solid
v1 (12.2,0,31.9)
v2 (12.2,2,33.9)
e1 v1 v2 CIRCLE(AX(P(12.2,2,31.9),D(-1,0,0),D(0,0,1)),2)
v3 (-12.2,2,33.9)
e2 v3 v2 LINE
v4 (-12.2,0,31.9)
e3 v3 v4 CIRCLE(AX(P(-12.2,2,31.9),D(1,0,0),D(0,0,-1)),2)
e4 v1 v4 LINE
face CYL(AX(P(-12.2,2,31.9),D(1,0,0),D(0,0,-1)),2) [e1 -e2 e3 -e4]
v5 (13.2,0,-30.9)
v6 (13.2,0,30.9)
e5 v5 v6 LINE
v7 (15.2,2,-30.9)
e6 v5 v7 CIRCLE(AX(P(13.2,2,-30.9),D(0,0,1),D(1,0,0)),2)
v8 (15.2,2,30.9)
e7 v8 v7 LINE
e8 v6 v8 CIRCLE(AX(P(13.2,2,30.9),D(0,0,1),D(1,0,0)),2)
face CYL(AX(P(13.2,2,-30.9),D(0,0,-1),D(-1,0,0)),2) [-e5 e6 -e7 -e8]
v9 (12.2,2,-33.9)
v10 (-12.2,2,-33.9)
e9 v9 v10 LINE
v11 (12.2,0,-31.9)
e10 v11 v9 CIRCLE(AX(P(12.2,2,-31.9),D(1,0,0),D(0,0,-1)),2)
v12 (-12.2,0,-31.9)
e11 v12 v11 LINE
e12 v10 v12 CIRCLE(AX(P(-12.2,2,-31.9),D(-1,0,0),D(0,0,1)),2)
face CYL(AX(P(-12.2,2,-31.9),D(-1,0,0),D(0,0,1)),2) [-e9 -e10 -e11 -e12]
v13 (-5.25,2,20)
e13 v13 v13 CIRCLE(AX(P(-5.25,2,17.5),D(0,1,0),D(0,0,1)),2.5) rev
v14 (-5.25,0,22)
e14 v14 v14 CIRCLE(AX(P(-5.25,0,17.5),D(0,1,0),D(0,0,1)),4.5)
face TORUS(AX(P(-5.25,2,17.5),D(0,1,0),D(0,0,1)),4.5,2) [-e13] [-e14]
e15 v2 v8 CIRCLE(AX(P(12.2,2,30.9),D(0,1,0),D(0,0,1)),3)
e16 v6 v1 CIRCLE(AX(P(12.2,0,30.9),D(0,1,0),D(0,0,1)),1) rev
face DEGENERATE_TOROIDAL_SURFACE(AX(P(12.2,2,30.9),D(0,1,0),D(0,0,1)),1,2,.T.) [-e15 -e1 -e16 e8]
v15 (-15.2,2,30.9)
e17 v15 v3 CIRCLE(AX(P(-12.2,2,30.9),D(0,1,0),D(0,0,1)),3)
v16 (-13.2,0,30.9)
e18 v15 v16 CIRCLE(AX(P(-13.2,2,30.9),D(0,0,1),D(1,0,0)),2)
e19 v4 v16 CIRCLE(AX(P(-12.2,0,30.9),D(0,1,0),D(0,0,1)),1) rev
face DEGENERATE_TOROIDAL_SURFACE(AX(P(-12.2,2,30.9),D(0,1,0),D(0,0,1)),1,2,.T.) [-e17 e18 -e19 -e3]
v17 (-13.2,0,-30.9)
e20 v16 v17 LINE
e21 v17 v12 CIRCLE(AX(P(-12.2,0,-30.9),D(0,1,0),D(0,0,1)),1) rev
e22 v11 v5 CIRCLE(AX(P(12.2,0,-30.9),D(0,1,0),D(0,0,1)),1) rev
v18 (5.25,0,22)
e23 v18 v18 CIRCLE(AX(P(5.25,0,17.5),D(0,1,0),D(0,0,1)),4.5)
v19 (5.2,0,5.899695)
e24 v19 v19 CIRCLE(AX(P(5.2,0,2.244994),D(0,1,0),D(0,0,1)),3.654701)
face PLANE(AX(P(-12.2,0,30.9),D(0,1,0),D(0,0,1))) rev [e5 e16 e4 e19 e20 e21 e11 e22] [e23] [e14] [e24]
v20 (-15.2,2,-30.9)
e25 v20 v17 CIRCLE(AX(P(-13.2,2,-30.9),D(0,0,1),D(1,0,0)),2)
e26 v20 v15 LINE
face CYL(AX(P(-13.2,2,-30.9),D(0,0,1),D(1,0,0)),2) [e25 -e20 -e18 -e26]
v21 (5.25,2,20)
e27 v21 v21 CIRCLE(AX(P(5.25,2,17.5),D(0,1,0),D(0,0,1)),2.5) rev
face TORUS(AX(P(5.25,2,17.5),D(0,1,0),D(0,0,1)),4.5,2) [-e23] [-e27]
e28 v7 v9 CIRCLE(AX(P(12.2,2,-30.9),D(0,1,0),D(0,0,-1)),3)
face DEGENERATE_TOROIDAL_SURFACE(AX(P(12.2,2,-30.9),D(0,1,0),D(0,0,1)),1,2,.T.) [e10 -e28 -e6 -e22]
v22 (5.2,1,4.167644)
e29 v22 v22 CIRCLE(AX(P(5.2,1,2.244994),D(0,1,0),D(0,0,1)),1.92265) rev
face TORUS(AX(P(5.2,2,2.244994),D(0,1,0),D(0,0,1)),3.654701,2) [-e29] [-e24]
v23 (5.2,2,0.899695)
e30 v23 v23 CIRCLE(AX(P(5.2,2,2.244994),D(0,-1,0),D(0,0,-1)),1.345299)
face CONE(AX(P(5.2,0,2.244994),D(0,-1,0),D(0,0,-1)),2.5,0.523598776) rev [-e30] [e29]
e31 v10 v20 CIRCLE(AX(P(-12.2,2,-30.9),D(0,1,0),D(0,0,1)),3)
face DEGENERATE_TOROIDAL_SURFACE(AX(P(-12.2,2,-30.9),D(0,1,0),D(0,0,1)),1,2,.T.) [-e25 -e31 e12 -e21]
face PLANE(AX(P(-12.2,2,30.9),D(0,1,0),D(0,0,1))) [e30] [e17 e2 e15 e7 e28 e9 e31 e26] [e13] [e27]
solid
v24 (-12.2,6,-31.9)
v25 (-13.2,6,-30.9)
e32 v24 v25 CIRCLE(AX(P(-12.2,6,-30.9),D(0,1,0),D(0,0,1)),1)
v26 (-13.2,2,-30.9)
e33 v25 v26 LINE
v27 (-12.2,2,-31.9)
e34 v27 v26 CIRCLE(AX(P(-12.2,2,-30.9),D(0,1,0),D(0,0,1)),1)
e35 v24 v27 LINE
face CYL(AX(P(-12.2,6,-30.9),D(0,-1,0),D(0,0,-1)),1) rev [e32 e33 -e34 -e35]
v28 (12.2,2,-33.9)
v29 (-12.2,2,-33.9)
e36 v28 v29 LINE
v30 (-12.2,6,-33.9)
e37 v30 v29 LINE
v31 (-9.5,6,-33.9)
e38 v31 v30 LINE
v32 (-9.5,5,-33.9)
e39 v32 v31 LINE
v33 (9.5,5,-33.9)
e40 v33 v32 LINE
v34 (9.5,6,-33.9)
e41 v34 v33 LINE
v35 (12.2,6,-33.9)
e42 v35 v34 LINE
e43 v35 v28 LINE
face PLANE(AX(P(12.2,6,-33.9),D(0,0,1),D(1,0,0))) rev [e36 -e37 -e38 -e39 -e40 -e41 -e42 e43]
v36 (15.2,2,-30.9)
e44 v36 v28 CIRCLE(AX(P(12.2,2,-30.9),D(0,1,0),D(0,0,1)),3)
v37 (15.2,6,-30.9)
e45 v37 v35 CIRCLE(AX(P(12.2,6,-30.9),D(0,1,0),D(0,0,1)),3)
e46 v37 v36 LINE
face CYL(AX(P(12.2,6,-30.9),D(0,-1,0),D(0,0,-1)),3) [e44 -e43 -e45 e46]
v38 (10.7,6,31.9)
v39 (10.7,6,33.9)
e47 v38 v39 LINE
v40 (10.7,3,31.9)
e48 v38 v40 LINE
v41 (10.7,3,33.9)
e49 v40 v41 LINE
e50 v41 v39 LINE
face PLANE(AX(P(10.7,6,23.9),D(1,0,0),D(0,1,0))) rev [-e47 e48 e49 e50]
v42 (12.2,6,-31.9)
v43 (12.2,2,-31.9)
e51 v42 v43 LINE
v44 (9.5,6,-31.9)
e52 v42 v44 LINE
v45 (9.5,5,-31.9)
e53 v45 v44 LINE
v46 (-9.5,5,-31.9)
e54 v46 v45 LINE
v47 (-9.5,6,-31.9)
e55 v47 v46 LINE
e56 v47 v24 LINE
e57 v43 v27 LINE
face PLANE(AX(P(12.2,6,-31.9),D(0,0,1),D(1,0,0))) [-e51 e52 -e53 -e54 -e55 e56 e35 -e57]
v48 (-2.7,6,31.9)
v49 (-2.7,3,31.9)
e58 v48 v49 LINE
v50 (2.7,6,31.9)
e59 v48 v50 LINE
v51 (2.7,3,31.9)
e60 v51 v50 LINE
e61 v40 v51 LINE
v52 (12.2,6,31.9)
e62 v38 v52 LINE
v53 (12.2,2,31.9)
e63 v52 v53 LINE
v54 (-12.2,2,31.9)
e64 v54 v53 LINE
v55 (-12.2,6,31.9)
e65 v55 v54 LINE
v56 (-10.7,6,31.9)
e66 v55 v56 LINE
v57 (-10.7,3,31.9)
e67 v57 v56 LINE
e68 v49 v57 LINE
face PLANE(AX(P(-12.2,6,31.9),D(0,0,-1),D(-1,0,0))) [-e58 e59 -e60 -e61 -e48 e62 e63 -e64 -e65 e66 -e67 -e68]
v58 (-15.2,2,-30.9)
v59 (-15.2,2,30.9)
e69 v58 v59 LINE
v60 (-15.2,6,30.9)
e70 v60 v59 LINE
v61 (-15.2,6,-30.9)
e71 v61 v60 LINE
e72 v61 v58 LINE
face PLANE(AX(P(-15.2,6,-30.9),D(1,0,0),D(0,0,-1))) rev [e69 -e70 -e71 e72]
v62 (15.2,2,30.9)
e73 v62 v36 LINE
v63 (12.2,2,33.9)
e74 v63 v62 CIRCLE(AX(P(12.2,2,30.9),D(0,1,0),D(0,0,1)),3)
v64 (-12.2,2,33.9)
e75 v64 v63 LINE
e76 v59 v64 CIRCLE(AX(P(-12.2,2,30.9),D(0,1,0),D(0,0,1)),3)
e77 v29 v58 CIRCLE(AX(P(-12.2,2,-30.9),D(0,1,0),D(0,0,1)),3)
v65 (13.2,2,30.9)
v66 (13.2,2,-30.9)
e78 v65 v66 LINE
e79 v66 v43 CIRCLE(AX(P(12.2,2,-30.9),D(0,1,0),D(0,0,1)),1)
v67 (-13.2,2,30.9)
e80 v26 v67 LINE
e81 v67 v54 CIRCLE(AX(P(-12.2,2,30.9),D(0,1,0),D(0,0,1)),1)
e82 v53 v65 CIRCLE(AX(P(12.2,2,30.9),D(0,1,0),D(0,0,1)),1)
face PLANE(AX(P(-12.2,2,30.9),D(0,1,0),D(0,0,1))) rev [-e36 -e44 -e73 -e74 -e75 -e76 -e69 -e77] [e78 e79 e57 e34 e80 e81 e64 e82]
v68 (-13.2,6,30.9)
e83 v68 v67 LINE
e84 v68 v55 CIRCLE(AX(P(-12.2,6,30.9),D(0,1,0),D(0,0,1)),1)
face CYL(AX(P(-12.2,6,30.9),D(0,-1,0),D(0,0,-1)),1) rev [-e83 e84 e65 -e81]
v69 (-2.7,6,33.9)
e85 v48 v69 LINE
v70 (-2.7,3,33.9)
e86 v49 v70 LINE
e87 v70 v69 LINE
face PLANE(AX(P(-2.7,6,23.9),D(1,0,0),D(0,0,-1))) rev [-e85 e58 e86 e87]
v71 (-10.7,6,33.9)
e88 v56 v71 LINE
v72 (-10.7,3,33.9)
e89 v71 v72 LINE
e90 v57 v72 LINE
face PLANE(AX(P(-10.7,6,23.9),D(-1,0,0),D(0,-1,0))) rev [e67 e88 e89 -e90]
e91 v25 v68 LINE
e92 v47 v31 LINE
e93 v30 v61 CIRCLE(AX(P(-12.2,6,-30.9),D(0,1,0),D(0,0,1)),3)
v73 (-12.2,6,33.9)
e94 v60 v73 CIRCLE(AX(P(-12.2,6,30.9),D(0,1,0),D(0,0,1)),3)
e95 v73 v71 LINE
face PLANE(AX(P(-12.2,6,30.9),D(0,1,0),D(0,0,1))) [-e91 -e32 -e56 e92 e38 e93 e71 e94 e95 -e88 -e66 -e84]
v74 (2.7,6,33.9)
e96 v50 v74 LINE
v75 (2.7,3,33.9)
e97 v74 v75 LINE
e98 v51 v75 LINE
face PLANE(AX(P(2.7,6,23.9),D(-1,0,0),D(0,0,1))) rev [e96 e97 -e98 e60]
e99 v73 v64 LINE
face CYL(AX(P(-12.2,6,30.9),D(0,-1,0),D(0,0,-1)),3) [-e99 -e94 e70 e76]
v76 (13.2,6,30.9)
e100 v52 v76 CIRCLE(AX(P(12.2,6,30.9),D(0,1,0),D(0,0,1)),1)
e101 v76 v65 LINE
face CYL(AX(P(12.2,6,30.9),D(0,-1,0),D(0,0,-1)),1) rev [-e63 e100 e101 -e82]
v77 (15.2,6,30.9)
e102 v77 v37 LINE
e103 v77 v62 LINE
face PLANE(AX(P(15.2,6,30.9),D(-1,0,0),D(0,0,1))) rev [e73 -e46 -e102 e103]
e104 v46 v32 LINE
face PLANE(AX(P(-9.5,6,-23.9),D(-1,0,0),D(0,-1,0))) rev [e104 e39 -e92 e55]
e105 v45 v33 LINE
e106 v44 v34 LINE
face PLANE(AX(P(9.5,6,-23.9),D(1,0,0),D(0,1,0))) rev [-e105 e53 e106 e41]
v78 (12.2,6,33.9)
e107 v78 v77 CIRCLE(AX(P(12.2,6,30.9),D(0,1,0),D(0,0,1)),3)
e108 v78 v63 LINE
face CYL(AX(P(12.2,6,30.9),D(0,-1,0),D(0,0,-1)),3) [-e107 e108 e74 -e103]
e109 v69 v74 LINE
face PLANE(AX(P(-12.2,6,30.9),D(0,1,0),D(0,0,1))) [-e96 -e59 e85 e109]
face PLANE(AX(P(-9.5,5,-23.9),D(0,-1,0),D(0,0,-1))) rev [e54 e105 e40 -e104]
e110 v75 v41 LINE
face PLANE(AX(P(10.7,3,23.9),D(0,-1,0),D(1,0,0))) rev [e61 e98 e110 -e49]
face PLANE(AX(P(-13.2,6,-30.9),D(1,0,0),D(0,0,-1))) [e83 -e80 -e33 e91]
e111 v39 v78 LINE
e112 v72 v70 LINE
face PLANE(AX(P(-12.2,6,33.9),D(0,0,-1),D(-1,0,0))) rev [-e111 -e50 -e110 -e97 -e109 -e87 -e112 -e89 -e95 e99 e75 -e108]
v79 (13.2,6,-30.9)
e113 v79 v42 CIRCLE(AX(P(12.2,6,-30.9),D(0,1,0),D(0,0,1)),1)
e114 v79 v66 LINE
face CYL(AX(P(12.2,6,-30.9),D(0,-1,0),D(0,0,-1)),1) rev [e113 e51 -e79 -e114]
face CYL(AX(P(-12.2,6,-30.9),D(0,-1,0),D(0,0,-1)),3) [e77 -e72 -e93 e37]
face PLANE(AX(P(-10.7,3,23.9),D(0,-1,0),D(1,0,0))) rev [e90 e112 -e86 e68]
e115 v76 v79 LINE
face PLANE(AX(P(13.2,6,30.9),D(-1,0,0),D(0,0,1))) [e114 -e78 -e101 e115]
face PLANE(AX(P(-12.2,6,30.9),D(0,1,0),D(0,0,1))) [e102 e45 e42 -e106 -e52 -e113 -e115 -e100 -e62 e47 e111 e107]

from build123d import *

# Parameters (mm, degrees)
BOSS_EXTRUDE1_DEPTH = 2
BOSS_EXTRUDE2_DEPTH = 4
SKETCH3_W           = 8
SKETCH3_H           = 3
CUT_EXTRUDE1_DEPTH  = 10
SKETCH4_W           = 19
SKETCH4_H           = 1
CUT_EXTRUDE2_DEPTH  = 10
SKETCH5_R           = 2.5
CUT_EXTRUDE3_DEPTH  = 2
CUT_EXTRUDE3_DRAFT  = -30
SKETCH6_R           = 2.5
CUT_EXTRUDE4_DEPTH  = 2
FILLET1_R           = 2


with BuildPart() as part:
    # Sketch1 → Boss-Extrude1 (new body)
    with BuildSketch(Plane(origin=(0, 0, 0), x_dir=(1, 0, 0), z_dir=(0, 1, 0))):
        with BuildLine():
            Line((-12.2, 33.9), (12.2, 33.9))
            ThreePointArc((12.2, 33.9), (14.321320344, 33.021320344), (15.2, 30.9))
            Line((15.2, 30.9), (15.2, -30.9))
            ThreePointArc((15.2, -30.9), (14.321320344, -33.021320344), (12.2, -33.9))
            Line((12.2, -33.9), (-12.2, -33.9))
            ThreePointArc((-12.2, -33.9), (-14.321320344, -33.021320344), (-15.2, -30.9))
            Line((-15.2, -30.9), (-15.2, 30.9))
            ThreePointArc((-15.2, 30.9), (-14.321320344, 33.021320344), (-12.2, 33.9))
        make_face()
    extrude(amount=BOSS_EXTRUDE1_DEPTH)


with BuildPart() as body_2:
    # Sketch2 → Boss-Extrude2 (new body)
    with BuildSketch(Plane(origin=(0, 2, 0), x_dir=(1, 0, 0), z_dir=(0, 1, 0))):
        with BuildLine():
            Line((-12.2, -33.9), (12.2, -33.9))
            ThreePointArc((12.2, -33.9), (14.321320344, -33.021320344), (15.2, -30.9))
            Line((15.2, -30.9), (15.2, 30.9))
            ThreePointArc((15.2, 30.9), (14.321320344, 33.021320344), (12.2, 33.9))
            Line((12.2, 33.9), (-12.2, 33.9))
            ThreePointArc((-12.2, 33.9), (-14.321320344, 33.021320344), (-15.2, 30.9))
            Line((-15.2, 30.9), (-15.2, -30.9))
            ThreePointArc((-15.2, -30.9), (-14.321320344, -33.021320344), (-12.2, -33.9))
        make_face()
        with BuildLine():
            Line((-12.2, -31.9), (12.2, -31.9))
            ThreePointArc((12.2, -31.9), (12.907106781, -31.607106781), (13.2, -30.9))
            Line((13.2, -30.9), (13.2, 30.9))
            ThreePointArc((13.2, 30.9), (12.907106781, 31.607106781), (12.2, 31.9))
            Line((12.2, 31.9), (-12.2, 31.9))
            ThreePointArc((-12.2, 31.9), (-12.907106781, 31.607106781), (-13.2, 30.9))
            Line((-13.2, 30.9), (-13.2, -30.9))
            ThreePointArc((-13.2, -30.9), (-12.907106781, -31.607106781), (-12.2, -31.9))
        make_face(mode=Mode.SUBTRACT)
    extrude(amount=BOSS_EXTRUDE2_DEPTH)

    # Sketch3 → Cut-Extrude1 (cut)
    with BuildSketch(Plane.XY.offset(33.9)):
        with Locations((6.7, 4.5)):
            Rectangle(SKETCH3_W, SKETCH3_H)
        with Locations((-6.7, 4.5)):
            Rectangle(SKETCH3_W, SKETCH3_H)
    extrude(amount=-CUT_EXTRUDE1_DEPTH, mode=Mode.SUBTRACT)

    # Sketch4 → Cut-Extrude2 (cut)
    with BuildSketch(Plane(origin=(0, 0, -33.9), x_dir=(-1, 0, 0), z_dir=(0, 0, -1))):
        with Locations((0, 5.5)):
            Rectangle(SKETCH4_W, SKETCH4_H)
    extrude(amount=-CUT_EXTRUDE2_DEPTH, mode=Mode.SUBTRACT)


with BuildPart() as cut_extrude3_tool:
    # Sketch5 → Cut-Extrude3 (with draft: the straight prism first)
    with BuildSketch(Plane.XZ):
        with Locations((5.2, 2.244994432)):
            Circle(SKETCH5_R)
    extrude(amount=-CUT_EXTRUDE3_DEPTH)
    # Cut-Extrude3: the draft: its side faces are tilted about the plane it starts from
    cut_extrude3_sides = [cut_extrude3_tool.faces().sort_by_distance(p)[0] for p in [
        (2.7, 1, 2.244994432),
    ]]
    draft(cut_extrude3_sides, Plane.XZ, CUT_EXTRUDE3_DRAFT)


with BuildPart() as part_1:
    add(part.part)

    # Cut-Extrude3: cut by cut_extrude3_tool
    add(cut_extrude3_tool.part, mode=Mode.SUBTRACT)

    # Sketch6 → Cut-Extrude4 (cut)
    with BuildSketch(Plane.XZ):
        with Locations(Location((5.25, 17.5, 0), (0, 0, 270))):
            Circle(SKETCH6_R)
        with Locations(Location((-5.25, 17.5, 0), (0, 0, 270))):
            Circle(SKETCH6_R)
    extrude(amount=-CUT_EXTRUDE4_DEPTH, mode=Mode.SUBTRACT)

    # Fillet1
    fillet1_edges = [part_1.edges().sort_by_distance(p)[0] for p in [
        (0, 0, 33.9),
        (14.321320344, 0, 33.021320344),
        (15.2, 0, 0),
        (14.321320344, 0, -33.021320344),
        (0, 0, -33.9),
        (-14.321320344, 0, -33.021320344),
        (-15.2, 0, 0),
        (-14.321320344, 0, 33.021320344),
        (2.7, 0, 2.244994432),
        (-5.25, 0, 20),
        (5.25, 0, 20),
    ]]
    fillet(fillet1_edges, radius=FILLET1_R - 0.0001)  # a hair under: the kernel refuses the full size


solid = Compound([body_2.part, part_1.part])
